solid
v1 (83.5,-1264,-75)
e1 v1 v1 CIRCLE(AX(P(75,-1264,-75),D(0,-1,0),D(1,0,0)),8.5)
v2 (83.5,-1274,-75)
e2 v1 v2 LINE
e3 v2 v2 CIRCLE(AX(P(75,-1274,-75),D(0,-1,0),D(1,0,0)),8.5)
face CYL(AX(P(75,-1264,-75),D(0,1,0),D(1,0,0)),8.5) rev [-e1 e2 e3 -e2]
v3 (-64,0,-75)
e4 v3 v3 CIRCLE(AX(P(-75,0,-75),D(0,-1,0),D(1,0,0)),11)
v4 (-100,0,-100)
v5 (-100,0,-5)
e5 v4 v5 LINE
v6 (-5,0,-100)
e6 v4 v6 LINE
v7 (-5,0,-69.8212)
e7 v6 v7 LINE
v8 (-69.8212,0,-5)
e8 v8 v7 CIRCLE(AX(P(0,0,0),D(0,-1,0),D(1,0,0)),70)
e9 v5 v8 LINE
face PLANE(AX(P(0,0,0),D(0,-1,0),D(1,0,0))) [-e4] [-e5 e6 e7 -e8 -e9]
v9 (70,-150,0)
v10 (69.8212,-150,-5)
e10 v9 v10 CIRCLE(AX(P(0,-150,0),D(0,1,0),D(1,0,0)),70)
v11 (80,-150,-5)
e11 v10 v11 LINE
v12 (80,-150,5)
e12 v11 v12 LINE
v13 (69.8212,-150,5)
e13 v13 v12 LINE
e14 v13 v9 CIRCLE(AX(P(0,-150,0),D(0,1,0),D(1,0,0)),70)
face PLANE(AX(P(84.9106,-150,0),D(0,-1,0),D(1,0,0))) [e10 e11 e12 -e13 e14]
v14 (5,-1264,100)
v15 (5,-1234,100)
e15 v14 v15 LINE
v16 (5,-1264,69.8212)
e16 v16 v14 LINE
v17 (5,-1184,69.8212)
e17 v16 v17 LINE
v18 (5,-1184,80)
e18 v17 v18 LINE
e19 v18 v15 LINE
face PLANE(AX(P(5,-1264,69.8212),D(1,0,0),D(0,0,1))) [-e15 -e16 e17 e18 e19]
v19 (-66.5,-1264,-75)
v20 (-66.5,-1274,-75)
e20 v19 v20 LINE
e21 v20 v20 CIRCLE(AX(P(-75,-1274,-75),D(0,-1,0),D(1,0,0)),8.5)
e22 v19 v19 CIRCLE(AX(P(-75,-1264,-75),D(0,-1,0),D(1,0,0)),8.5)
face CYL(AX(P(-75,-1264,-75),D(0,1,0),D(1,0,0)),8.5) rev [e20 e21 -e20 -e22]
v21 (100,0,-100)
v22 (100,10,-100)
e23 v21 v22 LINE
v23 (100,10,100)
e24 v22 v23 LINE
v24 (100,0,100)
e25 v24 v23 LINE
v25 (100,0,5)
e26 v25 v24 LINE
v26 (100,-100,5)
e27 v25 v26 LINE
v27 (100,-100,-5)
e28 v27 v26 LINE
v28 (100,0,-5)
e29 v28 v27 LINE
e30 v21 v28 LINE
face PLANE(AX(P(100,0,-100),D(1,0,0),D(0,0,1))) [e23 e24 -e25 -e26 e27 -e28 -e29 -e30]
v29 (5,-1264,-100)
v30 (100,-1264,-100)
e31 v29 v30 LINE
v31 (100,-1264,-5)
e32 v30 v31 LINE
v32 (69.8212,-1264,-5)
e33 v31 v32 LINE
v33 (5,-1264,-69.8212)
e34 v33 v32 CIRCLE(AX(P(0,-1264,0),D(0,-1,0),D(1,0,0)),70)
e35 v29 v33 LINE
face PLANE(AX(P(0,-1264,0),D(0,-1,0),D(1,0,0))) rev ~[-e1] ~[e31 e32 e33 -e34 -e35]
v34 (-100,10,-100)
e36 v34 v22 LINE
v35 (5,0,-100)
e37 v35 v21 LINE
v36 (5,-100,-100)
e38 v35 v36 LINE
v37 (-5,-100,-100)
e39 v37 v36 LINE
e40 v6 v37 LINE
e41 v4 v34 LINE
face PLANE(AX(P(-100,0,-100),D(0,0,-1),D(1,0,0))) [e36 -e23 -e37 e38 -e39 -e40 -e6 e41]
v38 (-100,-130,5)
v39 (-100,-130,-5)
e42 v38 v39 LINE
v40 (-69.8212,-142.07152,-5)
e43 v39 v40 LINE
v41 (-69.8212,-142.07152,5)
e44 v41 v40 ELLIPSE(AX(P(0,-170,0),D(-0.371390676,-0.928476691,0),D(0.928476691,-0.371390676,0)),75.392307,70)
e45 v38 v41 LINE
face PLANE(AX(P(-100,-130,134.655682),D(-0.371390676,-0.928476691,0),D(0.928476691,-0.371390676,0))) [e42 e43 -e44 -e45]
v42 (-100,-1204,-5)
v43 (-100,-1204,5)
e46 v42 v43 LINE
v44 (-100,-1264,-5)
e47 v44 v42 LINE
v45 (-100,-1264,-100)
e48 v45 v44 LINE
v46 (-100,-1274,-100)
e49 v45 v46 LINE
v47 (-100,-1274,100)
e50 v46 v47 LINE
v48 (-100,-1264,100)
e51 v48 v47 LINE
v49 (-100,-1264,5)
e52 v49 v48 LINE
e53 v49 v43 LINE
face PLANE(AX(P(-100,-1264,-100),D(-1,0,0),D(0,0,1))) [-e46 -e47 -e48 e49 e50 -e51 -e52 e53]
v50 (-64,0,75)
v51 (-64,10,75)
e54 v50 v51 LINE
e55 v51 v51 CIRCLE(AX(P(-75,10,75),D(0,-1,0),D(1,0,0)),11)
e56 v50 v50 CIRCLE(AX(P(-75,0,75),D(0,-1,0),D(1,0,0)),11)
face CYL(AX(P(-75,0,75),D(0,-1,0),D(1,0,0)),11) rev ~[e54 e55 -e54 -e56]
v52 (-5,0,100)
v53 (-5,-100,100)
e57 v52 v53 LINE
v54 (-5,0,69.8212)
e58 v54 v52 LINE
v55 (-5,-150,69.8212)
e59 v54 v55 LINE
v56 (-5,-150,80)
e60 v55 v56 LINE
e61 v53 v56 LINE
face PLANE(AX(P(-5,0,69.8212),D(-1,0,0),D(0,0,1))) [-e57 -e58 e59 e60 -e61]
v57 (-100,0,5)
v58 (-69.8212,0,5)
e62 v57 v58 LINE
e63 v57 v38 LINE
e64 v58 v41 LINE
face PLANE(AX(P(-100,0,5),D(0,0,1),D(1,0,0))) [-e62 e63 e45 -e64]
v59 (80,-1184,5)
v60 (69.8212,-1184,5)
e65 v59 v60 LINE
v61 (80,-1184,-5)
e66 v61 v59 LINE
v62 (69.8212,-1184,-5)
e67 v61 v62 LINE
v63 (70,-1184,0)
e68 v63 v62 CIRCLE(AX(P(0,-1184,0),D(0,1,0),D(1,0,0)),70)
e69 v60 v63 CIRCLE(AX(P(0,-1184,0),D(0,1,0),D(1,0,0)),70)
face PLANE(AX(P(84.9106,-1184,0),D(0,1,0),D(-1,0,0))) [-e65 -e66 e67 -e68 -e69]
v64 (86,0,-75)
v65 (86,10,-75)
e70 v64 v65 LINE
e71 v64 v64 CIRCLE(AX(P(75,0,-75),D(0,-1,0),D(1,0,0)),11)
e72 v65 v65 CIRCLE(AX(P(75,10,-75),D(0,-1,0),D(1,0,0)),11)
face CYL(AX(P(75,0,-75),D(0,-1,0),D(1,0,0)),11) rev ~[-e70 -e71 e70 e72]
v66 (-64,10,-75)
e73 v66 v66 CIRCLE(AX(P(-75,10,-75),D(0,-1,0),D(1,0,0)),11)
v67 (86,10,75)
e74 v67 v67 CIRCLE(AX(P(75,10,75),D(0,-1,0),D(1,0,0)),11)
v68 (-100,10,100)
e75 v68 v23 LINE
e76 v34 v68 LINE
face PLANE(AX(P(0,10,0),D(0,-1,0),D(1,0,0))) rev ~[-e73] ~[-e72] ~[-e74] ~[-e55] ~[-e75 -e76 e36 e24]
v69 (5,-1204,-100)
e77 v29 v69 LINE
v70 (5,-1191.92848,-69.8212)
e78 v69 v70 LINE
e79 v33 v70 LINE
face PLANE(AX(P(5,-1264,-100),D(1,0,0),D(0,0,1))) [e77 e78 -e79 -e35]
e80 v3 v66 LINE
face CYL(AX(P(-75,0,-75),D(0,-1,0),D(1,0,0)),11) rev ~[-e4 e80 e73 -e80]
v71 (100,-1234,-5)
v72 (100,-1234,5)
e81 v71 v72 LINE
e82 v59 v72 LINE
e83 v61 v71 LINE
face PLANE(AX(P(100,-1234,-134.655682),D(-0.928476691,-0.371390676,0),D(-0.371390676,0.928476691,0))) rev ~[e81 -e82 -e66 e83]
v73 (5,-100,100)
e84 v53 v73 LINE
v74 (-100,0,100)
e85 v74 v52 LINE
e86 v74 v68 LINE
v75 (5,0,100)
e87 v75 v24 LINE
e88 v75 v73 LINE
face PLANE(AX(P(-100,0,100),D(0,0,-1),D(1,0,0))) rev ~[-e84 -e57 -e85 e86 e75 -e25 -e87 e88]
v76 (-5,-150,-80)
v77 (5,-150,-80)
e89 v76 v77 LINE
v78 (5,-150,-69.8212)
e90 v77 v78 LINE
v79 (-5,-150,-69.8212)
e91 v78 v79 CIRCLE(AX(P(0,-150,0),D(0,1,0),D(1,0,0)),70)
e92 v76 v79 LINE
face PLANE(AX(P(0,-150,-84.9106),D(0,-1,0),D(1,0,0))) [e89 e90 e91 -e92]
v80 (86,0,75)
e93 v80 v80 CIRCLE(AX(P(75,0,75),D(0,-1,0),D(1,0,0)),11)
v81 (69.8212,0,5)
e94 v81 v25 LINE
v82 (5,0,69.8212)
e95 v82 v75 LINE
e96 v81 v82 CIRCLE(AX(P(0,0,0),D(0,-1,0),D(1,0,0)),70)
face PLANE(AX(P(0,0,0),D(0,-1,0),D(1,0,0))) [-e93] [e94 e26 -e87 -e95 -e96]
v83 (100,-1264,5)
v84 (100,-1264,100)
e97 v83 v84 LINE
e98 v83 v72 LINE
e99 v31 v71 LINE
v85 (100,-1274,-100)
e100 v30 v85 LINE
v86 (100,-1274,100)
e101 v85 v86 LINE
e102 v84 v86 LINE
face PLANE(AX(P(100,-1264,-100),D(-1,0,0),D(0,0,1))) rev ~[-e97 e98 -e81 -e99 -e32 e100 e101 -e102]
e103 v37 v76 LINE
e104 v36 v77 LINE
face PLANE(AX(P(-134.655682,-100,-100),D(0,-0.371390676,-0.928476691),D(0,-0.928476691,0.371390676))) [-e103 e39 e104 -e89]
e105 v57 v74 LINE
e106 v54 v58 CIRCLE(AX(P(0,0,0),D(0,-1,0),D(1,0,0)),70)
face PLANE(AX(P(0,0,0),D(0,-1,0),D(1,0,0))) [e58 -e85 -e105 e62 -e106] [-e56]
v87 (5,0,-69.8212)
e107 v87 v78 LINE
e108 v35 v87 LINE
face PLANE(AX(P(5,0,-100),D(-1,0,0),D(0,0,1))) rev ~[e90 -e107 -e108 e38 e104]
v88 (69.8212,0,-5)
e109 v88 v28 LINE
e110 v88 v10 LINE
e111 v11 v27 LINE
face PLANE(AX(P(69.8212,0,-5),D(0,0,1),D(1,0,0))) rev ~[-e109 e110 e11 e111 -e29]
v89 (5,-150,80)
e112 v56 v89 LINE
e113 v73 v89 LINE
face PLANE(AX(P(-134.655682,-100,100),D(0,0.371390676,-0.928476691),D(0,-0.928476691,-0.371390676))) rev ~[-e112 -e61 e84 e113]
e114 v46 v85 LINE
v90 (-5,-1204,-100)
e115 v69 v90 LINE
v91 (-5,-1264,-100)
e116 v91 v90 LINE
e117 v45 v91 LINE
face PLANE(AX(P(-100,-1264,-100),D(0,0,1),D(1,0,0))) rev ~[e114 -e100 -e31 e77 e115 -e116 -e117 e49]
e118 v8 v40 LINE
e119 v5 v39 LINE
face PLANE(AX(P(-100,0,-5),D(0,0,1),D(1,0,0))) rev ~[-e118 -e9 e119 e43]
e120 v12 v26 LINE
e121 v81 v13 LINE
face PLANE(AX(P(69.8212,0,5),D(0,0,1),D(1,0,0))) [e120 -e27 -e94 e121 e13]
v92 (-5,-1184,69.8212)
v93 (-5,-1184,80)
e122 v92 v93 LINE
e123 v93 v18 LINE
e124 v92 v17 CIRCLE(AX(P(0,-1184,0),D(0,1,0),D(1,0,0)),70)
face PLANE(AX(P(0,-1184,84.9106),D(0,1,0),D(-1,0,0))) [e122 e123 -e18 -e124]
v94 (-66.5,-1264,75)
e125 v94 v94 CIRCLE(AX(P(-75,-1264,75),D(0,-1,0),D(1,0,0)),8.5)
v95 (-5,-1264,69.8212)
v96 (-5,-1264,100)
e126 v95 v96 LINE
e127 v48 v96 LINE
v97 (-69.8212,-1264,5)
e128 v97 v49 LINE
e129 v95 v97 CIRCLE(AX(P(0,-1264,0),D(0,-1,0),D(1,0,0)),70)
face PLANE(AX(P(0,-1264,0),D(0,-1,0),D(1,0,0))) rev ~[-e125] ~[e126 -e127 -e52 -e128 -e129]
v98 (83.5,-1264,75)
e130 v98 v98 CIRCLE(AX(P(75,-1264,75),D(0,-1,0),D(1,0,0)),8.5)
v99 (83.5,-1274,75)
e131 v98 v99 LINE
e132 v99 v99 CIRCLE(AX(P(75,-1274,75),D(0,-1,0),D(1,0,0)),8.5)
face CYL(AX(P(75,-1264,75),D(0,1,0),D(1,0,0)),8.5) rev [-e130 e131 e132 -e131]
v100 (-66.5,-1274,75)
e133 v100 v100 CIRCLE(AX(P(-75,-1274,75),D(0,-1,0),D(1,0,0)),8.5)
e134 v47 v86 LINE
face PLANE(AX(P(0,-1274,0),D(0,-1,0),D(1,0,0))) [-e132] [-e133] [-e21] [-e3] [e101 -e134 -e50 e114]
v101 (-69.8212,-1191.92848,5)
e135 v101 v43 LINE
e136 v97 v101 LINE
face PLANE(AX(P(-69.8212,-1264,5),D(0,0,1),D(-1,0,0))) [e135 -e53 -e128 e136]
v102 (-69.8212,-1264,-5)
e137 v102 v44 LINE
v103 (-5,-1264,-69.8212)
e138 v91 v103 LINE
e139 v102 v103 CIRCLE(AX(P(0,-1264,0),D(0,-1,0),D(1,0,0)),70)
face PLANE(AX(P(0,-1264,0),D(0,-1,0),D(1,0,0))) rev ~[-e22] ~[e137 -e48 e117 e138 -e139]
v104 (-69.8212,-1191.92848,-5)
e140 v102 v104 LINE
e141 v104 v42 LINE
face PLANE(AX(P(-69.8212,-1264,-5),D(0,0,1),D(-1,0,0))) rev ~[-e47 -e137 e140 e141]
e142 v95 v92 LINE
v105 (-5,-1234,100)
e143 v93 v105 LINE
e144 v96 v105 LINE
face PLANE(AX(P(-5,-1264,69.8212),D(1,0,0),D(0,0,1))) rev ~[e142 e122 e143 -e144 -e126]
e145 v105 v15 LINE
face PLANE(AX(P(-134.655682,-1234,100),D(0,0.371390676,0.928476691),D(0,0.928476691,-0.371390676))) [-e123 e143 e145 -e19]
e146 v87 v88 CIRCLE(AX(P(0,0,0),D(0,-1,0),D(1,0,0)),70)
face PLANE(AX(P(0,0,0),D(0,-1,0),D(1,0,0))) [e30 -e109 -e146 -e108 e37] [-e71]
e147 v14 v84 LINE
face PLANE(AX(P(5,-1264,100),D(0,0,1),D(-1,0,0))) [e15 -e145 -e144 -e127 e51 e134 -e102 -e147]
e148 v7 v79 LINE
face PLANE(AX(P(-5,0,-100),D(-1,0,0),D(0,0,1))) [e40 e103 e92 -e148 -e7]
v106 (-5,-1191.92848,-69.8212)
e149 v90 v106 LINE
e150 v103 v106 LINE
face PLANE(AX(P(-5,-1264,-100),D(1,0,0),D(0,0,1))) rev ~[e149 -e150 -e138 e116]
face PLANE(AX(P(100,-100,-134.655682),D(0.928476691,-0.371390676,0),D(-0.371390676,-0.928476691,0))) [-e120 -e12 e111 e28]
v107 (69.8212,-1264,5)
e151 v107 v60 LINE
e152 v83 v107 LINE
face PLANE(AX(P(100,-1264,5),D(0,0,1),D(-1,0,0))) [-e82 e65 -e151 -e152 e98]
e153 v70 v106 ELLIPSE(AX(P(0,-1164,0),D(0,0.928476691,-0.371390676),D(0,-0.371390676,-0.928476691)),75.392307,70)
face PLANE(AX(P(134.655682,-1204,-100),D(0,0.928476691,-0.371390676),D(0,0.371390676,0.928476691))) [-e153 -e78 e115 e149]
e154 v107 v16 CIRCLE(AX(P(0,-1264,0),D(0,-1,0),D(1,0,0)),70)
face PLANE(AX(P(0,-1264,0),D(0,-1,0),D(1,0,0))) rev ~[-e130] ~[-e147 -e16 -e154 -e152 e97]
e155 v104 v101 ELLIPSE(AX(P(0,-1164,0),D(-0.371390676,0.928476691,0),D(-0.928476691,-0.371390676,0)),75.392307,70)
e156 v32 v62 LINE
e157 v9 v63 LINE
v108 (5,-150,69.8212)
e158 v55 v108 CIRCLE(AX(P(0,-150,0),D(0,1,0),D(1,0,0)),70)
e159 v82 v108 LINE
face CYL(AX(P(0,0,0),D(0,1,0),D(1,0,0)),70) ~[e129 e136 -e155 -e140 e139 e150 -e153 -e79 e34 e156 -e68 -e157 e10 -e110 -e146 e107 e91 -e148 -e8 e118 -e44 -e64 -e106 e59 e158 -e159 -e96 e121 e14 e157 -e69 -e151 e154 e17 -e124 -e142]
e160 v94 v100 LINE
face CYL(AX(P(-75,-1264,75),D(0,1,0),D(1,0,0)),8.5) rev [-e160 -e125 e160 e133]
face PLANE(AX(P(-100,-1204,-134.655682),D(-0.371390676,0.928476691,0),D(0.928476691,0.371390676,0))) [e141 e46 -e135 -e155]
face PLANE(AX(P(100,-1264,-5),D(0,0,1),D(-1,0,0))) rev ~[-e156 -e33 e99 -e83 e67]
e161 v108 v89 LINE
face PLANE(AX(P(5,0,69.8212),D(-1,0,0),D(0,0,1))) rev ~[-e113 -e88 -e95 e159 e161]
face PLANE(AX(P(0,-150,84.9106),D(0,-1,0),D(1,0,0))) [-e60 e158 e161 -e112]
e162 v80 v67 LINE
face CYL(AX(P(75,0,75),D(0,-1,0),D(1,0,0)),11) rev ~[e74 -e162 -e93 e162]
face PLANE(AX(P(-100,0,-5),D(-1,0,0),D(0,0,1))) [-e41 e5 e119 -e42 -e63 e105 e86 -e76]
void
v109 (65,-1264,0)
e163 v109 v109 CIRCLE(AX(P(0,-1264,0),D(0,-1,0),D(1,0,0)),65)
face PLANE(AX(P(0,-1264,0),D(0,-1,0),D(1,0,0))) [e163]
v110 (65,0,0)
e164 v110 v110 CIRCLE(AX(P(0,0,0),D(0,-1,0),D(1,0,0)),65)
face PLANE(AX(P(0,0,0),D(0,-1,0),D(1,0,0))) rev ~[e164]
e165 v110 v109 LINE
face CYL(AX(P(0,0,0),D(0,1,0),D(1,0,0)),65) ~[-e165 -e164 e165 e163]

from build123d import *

# Parameters (mm, degrees)
F0_R          = 70
F0_R_2        = 65
F1_DEPTH      = 1264
F2_W          = 200
F2_H          = 200
F2_R          = 11
F3_DEPTH      = 10
F4_W          = 30.1787997812
F4_H          = 10
F4_W_2        = 10
F4_H_2        = 30.1787997812
F5_DEPTH      = 150
F6_T1_DEPTH   = 269.311363913
F6_T3_DEPTH   = 269.311363913
F6_T8_DEPTH   = 269.311363913
F6_S9_R       = 70
F6_T10_DEPTH  = 139
F8_W          = 200
F8_H          = 200
F8_R          = 8.5
F9_DEPTH      = 10
F10_W         = 10
F10_H         = 30.1787997812
F10_W_2       = 30.1787997812
F10_H_2       = 10
F11_DEPTH     = 80
F12_T1_DEPTH  = 269.311363913
F12_T3_DEPTH  = 269.311363913
F12_T8_DEPTH  = 269.311363913
F12_S9_R      = 70
F12_T10_DEPTH = 139
F12_T14_DEPTH = 269.311363913
F12_S15_R     = 70
F12_T16_DEPTH = 139


# Not quite as in the source:
# - a fillet or chamfer that OpenCascade refuses, or shapes differently, is made with other operations: its cross-section is extruded or revolved along the edge and cut away or added


with BuildPart() as f1:
    # F0 (on Front) → F1 (new body)
    with BuildSketch(Plane.XZ):
        Circle(F0_R)
        Circle(F0_R_2, mode=Mode.SUBTRACT)
    extrude(amount=F1_DEPTH)

    # F2 (on Front) → F3 (join)
    with BuildSketch(Plane.XZ):
        Rectangle(F2_W, F2_H)
        with Locations((-75, -75)):
            Circle(F2_R, mode=Mode.SUBTRACT)
        with Locations((75, -75)):
            Circle(F2_R, mode=Mode.SUBTRACT)
        with Locations((-75, 75)):
            Circle(F2_R, mode=Mode.SUBTRACT)
        with Locations((75, 75)):
            Circle(F2_R, mode=Mode.SUBTRACT)
    extrude(amount=-F3_DEPTH)

    # F4 (on Front) → F5 (join)
    with BuildSketch(Plane.XZ):
        with Locations((-84.9106001094, 0)):
            Rectangle(F4_W, F4_H)
        with Locations((0, 84.9106001094)):
            Rectangle(F4_W_2, F4_H_2)
        with Locations((84.9106001094, 0)):
            Rectangle(F4_W, F4_H)
        with Locations((0, -84.9106001094)):
            Rectangle(F4_W_2, F4_H_2)
    extrude(amount=F5_DEPTH)

    # F6: chamfer of 50 x 20 on 4 edges, made by hand

    # F6_s2 → F6_t1 (cut)
    with BuildSketch(Plane.YZ.offset(-134.6556819565)):
        Polygon((-100, 100), (-150, 80), (-150, 100), align=None)
        Polygon((-100, -100), (-150, -80), (-150, -100), align=None)
    extrude(amount=F6_T1_DEPTH, mode=Mode.SUBTRACT)

    # F6_s4 → F6_t3 (cut)
    with BuildSketch(Plane.XY.offset(-134.6556819565)):
        Polygon((100, -100), (80, -150), (100, -150), align=None)
    extrude(amount=F6_T3_DEPTH, mode=Mode.SUBTRACT)


with BuildPart() as f6_tool6:
    # F6_s7 → F6_t8 (new body)
    with BuildSketch(Plane.XY.offset(134.6556819565)):
        Polygon((-100, -130), (-50, -150), (-100, -150), align=None)
    extrude(amount=-F6_T8_DEPTH)

    # F6_s9 → F6_t10 (cut, symmetric)
    with BuildSketch(Plane.XZ.offset(140)):
        Circle(F6_S9_R)
    extrude(amount=F6_T10_DEPTH, both=True, mode=Mode.SUBTRACT)


with BuildPart() as f1_1:
    add(f1.part)

    # F6_t5: cut F6_tool6
    add(f6_tool6.part, mode=Mode.SUBTRACT)

    # F8 (on offset) → F9 (join)
    with BuildSketch(Plane.XZ.offset(1264)):
        Rectangle(F8_W, F8_H)
        with Locations((-75, -75)):
            Circle(F8_R, mode=Mode.SUBTRACT)
        with Locations((75, -75)):
            Circle(F8_R, mode=Mode.SUBTRACT)
        with Locations((-75, 75)):
            Circle(F8_R, mode=Mode.SUBTRACT)
        with Locations((75, 75)):
            Circle(F8_R, mode=Mode.SUBTRACT)
    extrude(amount=F9_DEPTH)

    # F10 (on face) → F11 (join)
    with BuildSketch(Plane(origin=(0, -1264, 0), x_dir=(-1, 0, 0), z_dir=(0, 1, 0))):
        with Locations((0, 84.9106001094)):
            Rectangle(F10_W, F10_H)
        with Locations((84.9106001094, 0)):
            Rectangle(F10_W_2, F10_H_2)
        with Locations((0, -84.9106001094)):
            Rectangle(F10_W, F10_H)
        with Locations((-84.9106001094, 0)):
            Rectangle(F10_W_2, F10_H_2)
    extrude(amount=F11_DEPTH)

    # F12: chamfer of 20 x 50 on 4 edges, made by hand

    # F12_s2 → F12_t1 (cut)
    with BuildSketch(Plane.YZ.offset(-134.6556819565)):
        Polygon((-1234, 100), (-1184, 80), (-1184, 100), align=None)
    extrude(amount=F12_T1_DEPTH, mode=Mode.SUBTRACT)

    # F12_s4 → F12_t3 (cut)
    with BuildSketch(Plane.XY.offset(-134.6556819565)):
        Polygon((100, -1234), (80, -1184), (100, -1184), align=None)
    extrude(amount=F12_T3_DEPTH, mode=Mode.SUBTRACT)


with BuildPart() as f12_tool6:
    # F12_s7 → F12_t8 (new body)
    with BuildSketch(Plane.XY.offset(-134.6556819565)):
        Polygon((-100, -1204), (-50, -1184), (-100, -1184), align=None)
    extrude(amount=F12_T8_DEPTH)

    # F12_s9 → F12_t10 (cut, symmetric)
    with BuildSketch(Plane.XZ.offset(1194)):
        Circle(F12_S9_R)
    extrude(amount=F12_T10_DEPTH, both=True, mode=Mode.SUBTRACT)


with BuildPart() as f1_2:
    add(f1_1.part)

    # F12_t5: cut F12_tool6
    add(f12_tool6.part, mode=Mode.SUBTRACT)


with BuildPart() as f12_tool12:
    # F12_s13 → F12_t14 (new body)
    with BuildSketch(Plane.YZ.offset(134.6556819565)):
        Polygon((-1204, -100), (-1184, -50), (-1184, -100), align=None)
    extrude(amount=-F12_T14_DEPTH)

    # F12_s15 → F12_t16 (cut, symmetric)
    with BuildSketch(Plane.XZ.offset(1194)):
        Circle(F12_S15_R)
    extrude(amount=F12_T16_DEPTH, both=True, mode=Mode.SUBTRACT)


with BuildPart() as f1_3:
    add(f1_2.part)

    # F12_t11: cut F12_tool12
    add(f12_tool12.part, mode=Mode.SUBTRACT)


solid = f1_3.part
